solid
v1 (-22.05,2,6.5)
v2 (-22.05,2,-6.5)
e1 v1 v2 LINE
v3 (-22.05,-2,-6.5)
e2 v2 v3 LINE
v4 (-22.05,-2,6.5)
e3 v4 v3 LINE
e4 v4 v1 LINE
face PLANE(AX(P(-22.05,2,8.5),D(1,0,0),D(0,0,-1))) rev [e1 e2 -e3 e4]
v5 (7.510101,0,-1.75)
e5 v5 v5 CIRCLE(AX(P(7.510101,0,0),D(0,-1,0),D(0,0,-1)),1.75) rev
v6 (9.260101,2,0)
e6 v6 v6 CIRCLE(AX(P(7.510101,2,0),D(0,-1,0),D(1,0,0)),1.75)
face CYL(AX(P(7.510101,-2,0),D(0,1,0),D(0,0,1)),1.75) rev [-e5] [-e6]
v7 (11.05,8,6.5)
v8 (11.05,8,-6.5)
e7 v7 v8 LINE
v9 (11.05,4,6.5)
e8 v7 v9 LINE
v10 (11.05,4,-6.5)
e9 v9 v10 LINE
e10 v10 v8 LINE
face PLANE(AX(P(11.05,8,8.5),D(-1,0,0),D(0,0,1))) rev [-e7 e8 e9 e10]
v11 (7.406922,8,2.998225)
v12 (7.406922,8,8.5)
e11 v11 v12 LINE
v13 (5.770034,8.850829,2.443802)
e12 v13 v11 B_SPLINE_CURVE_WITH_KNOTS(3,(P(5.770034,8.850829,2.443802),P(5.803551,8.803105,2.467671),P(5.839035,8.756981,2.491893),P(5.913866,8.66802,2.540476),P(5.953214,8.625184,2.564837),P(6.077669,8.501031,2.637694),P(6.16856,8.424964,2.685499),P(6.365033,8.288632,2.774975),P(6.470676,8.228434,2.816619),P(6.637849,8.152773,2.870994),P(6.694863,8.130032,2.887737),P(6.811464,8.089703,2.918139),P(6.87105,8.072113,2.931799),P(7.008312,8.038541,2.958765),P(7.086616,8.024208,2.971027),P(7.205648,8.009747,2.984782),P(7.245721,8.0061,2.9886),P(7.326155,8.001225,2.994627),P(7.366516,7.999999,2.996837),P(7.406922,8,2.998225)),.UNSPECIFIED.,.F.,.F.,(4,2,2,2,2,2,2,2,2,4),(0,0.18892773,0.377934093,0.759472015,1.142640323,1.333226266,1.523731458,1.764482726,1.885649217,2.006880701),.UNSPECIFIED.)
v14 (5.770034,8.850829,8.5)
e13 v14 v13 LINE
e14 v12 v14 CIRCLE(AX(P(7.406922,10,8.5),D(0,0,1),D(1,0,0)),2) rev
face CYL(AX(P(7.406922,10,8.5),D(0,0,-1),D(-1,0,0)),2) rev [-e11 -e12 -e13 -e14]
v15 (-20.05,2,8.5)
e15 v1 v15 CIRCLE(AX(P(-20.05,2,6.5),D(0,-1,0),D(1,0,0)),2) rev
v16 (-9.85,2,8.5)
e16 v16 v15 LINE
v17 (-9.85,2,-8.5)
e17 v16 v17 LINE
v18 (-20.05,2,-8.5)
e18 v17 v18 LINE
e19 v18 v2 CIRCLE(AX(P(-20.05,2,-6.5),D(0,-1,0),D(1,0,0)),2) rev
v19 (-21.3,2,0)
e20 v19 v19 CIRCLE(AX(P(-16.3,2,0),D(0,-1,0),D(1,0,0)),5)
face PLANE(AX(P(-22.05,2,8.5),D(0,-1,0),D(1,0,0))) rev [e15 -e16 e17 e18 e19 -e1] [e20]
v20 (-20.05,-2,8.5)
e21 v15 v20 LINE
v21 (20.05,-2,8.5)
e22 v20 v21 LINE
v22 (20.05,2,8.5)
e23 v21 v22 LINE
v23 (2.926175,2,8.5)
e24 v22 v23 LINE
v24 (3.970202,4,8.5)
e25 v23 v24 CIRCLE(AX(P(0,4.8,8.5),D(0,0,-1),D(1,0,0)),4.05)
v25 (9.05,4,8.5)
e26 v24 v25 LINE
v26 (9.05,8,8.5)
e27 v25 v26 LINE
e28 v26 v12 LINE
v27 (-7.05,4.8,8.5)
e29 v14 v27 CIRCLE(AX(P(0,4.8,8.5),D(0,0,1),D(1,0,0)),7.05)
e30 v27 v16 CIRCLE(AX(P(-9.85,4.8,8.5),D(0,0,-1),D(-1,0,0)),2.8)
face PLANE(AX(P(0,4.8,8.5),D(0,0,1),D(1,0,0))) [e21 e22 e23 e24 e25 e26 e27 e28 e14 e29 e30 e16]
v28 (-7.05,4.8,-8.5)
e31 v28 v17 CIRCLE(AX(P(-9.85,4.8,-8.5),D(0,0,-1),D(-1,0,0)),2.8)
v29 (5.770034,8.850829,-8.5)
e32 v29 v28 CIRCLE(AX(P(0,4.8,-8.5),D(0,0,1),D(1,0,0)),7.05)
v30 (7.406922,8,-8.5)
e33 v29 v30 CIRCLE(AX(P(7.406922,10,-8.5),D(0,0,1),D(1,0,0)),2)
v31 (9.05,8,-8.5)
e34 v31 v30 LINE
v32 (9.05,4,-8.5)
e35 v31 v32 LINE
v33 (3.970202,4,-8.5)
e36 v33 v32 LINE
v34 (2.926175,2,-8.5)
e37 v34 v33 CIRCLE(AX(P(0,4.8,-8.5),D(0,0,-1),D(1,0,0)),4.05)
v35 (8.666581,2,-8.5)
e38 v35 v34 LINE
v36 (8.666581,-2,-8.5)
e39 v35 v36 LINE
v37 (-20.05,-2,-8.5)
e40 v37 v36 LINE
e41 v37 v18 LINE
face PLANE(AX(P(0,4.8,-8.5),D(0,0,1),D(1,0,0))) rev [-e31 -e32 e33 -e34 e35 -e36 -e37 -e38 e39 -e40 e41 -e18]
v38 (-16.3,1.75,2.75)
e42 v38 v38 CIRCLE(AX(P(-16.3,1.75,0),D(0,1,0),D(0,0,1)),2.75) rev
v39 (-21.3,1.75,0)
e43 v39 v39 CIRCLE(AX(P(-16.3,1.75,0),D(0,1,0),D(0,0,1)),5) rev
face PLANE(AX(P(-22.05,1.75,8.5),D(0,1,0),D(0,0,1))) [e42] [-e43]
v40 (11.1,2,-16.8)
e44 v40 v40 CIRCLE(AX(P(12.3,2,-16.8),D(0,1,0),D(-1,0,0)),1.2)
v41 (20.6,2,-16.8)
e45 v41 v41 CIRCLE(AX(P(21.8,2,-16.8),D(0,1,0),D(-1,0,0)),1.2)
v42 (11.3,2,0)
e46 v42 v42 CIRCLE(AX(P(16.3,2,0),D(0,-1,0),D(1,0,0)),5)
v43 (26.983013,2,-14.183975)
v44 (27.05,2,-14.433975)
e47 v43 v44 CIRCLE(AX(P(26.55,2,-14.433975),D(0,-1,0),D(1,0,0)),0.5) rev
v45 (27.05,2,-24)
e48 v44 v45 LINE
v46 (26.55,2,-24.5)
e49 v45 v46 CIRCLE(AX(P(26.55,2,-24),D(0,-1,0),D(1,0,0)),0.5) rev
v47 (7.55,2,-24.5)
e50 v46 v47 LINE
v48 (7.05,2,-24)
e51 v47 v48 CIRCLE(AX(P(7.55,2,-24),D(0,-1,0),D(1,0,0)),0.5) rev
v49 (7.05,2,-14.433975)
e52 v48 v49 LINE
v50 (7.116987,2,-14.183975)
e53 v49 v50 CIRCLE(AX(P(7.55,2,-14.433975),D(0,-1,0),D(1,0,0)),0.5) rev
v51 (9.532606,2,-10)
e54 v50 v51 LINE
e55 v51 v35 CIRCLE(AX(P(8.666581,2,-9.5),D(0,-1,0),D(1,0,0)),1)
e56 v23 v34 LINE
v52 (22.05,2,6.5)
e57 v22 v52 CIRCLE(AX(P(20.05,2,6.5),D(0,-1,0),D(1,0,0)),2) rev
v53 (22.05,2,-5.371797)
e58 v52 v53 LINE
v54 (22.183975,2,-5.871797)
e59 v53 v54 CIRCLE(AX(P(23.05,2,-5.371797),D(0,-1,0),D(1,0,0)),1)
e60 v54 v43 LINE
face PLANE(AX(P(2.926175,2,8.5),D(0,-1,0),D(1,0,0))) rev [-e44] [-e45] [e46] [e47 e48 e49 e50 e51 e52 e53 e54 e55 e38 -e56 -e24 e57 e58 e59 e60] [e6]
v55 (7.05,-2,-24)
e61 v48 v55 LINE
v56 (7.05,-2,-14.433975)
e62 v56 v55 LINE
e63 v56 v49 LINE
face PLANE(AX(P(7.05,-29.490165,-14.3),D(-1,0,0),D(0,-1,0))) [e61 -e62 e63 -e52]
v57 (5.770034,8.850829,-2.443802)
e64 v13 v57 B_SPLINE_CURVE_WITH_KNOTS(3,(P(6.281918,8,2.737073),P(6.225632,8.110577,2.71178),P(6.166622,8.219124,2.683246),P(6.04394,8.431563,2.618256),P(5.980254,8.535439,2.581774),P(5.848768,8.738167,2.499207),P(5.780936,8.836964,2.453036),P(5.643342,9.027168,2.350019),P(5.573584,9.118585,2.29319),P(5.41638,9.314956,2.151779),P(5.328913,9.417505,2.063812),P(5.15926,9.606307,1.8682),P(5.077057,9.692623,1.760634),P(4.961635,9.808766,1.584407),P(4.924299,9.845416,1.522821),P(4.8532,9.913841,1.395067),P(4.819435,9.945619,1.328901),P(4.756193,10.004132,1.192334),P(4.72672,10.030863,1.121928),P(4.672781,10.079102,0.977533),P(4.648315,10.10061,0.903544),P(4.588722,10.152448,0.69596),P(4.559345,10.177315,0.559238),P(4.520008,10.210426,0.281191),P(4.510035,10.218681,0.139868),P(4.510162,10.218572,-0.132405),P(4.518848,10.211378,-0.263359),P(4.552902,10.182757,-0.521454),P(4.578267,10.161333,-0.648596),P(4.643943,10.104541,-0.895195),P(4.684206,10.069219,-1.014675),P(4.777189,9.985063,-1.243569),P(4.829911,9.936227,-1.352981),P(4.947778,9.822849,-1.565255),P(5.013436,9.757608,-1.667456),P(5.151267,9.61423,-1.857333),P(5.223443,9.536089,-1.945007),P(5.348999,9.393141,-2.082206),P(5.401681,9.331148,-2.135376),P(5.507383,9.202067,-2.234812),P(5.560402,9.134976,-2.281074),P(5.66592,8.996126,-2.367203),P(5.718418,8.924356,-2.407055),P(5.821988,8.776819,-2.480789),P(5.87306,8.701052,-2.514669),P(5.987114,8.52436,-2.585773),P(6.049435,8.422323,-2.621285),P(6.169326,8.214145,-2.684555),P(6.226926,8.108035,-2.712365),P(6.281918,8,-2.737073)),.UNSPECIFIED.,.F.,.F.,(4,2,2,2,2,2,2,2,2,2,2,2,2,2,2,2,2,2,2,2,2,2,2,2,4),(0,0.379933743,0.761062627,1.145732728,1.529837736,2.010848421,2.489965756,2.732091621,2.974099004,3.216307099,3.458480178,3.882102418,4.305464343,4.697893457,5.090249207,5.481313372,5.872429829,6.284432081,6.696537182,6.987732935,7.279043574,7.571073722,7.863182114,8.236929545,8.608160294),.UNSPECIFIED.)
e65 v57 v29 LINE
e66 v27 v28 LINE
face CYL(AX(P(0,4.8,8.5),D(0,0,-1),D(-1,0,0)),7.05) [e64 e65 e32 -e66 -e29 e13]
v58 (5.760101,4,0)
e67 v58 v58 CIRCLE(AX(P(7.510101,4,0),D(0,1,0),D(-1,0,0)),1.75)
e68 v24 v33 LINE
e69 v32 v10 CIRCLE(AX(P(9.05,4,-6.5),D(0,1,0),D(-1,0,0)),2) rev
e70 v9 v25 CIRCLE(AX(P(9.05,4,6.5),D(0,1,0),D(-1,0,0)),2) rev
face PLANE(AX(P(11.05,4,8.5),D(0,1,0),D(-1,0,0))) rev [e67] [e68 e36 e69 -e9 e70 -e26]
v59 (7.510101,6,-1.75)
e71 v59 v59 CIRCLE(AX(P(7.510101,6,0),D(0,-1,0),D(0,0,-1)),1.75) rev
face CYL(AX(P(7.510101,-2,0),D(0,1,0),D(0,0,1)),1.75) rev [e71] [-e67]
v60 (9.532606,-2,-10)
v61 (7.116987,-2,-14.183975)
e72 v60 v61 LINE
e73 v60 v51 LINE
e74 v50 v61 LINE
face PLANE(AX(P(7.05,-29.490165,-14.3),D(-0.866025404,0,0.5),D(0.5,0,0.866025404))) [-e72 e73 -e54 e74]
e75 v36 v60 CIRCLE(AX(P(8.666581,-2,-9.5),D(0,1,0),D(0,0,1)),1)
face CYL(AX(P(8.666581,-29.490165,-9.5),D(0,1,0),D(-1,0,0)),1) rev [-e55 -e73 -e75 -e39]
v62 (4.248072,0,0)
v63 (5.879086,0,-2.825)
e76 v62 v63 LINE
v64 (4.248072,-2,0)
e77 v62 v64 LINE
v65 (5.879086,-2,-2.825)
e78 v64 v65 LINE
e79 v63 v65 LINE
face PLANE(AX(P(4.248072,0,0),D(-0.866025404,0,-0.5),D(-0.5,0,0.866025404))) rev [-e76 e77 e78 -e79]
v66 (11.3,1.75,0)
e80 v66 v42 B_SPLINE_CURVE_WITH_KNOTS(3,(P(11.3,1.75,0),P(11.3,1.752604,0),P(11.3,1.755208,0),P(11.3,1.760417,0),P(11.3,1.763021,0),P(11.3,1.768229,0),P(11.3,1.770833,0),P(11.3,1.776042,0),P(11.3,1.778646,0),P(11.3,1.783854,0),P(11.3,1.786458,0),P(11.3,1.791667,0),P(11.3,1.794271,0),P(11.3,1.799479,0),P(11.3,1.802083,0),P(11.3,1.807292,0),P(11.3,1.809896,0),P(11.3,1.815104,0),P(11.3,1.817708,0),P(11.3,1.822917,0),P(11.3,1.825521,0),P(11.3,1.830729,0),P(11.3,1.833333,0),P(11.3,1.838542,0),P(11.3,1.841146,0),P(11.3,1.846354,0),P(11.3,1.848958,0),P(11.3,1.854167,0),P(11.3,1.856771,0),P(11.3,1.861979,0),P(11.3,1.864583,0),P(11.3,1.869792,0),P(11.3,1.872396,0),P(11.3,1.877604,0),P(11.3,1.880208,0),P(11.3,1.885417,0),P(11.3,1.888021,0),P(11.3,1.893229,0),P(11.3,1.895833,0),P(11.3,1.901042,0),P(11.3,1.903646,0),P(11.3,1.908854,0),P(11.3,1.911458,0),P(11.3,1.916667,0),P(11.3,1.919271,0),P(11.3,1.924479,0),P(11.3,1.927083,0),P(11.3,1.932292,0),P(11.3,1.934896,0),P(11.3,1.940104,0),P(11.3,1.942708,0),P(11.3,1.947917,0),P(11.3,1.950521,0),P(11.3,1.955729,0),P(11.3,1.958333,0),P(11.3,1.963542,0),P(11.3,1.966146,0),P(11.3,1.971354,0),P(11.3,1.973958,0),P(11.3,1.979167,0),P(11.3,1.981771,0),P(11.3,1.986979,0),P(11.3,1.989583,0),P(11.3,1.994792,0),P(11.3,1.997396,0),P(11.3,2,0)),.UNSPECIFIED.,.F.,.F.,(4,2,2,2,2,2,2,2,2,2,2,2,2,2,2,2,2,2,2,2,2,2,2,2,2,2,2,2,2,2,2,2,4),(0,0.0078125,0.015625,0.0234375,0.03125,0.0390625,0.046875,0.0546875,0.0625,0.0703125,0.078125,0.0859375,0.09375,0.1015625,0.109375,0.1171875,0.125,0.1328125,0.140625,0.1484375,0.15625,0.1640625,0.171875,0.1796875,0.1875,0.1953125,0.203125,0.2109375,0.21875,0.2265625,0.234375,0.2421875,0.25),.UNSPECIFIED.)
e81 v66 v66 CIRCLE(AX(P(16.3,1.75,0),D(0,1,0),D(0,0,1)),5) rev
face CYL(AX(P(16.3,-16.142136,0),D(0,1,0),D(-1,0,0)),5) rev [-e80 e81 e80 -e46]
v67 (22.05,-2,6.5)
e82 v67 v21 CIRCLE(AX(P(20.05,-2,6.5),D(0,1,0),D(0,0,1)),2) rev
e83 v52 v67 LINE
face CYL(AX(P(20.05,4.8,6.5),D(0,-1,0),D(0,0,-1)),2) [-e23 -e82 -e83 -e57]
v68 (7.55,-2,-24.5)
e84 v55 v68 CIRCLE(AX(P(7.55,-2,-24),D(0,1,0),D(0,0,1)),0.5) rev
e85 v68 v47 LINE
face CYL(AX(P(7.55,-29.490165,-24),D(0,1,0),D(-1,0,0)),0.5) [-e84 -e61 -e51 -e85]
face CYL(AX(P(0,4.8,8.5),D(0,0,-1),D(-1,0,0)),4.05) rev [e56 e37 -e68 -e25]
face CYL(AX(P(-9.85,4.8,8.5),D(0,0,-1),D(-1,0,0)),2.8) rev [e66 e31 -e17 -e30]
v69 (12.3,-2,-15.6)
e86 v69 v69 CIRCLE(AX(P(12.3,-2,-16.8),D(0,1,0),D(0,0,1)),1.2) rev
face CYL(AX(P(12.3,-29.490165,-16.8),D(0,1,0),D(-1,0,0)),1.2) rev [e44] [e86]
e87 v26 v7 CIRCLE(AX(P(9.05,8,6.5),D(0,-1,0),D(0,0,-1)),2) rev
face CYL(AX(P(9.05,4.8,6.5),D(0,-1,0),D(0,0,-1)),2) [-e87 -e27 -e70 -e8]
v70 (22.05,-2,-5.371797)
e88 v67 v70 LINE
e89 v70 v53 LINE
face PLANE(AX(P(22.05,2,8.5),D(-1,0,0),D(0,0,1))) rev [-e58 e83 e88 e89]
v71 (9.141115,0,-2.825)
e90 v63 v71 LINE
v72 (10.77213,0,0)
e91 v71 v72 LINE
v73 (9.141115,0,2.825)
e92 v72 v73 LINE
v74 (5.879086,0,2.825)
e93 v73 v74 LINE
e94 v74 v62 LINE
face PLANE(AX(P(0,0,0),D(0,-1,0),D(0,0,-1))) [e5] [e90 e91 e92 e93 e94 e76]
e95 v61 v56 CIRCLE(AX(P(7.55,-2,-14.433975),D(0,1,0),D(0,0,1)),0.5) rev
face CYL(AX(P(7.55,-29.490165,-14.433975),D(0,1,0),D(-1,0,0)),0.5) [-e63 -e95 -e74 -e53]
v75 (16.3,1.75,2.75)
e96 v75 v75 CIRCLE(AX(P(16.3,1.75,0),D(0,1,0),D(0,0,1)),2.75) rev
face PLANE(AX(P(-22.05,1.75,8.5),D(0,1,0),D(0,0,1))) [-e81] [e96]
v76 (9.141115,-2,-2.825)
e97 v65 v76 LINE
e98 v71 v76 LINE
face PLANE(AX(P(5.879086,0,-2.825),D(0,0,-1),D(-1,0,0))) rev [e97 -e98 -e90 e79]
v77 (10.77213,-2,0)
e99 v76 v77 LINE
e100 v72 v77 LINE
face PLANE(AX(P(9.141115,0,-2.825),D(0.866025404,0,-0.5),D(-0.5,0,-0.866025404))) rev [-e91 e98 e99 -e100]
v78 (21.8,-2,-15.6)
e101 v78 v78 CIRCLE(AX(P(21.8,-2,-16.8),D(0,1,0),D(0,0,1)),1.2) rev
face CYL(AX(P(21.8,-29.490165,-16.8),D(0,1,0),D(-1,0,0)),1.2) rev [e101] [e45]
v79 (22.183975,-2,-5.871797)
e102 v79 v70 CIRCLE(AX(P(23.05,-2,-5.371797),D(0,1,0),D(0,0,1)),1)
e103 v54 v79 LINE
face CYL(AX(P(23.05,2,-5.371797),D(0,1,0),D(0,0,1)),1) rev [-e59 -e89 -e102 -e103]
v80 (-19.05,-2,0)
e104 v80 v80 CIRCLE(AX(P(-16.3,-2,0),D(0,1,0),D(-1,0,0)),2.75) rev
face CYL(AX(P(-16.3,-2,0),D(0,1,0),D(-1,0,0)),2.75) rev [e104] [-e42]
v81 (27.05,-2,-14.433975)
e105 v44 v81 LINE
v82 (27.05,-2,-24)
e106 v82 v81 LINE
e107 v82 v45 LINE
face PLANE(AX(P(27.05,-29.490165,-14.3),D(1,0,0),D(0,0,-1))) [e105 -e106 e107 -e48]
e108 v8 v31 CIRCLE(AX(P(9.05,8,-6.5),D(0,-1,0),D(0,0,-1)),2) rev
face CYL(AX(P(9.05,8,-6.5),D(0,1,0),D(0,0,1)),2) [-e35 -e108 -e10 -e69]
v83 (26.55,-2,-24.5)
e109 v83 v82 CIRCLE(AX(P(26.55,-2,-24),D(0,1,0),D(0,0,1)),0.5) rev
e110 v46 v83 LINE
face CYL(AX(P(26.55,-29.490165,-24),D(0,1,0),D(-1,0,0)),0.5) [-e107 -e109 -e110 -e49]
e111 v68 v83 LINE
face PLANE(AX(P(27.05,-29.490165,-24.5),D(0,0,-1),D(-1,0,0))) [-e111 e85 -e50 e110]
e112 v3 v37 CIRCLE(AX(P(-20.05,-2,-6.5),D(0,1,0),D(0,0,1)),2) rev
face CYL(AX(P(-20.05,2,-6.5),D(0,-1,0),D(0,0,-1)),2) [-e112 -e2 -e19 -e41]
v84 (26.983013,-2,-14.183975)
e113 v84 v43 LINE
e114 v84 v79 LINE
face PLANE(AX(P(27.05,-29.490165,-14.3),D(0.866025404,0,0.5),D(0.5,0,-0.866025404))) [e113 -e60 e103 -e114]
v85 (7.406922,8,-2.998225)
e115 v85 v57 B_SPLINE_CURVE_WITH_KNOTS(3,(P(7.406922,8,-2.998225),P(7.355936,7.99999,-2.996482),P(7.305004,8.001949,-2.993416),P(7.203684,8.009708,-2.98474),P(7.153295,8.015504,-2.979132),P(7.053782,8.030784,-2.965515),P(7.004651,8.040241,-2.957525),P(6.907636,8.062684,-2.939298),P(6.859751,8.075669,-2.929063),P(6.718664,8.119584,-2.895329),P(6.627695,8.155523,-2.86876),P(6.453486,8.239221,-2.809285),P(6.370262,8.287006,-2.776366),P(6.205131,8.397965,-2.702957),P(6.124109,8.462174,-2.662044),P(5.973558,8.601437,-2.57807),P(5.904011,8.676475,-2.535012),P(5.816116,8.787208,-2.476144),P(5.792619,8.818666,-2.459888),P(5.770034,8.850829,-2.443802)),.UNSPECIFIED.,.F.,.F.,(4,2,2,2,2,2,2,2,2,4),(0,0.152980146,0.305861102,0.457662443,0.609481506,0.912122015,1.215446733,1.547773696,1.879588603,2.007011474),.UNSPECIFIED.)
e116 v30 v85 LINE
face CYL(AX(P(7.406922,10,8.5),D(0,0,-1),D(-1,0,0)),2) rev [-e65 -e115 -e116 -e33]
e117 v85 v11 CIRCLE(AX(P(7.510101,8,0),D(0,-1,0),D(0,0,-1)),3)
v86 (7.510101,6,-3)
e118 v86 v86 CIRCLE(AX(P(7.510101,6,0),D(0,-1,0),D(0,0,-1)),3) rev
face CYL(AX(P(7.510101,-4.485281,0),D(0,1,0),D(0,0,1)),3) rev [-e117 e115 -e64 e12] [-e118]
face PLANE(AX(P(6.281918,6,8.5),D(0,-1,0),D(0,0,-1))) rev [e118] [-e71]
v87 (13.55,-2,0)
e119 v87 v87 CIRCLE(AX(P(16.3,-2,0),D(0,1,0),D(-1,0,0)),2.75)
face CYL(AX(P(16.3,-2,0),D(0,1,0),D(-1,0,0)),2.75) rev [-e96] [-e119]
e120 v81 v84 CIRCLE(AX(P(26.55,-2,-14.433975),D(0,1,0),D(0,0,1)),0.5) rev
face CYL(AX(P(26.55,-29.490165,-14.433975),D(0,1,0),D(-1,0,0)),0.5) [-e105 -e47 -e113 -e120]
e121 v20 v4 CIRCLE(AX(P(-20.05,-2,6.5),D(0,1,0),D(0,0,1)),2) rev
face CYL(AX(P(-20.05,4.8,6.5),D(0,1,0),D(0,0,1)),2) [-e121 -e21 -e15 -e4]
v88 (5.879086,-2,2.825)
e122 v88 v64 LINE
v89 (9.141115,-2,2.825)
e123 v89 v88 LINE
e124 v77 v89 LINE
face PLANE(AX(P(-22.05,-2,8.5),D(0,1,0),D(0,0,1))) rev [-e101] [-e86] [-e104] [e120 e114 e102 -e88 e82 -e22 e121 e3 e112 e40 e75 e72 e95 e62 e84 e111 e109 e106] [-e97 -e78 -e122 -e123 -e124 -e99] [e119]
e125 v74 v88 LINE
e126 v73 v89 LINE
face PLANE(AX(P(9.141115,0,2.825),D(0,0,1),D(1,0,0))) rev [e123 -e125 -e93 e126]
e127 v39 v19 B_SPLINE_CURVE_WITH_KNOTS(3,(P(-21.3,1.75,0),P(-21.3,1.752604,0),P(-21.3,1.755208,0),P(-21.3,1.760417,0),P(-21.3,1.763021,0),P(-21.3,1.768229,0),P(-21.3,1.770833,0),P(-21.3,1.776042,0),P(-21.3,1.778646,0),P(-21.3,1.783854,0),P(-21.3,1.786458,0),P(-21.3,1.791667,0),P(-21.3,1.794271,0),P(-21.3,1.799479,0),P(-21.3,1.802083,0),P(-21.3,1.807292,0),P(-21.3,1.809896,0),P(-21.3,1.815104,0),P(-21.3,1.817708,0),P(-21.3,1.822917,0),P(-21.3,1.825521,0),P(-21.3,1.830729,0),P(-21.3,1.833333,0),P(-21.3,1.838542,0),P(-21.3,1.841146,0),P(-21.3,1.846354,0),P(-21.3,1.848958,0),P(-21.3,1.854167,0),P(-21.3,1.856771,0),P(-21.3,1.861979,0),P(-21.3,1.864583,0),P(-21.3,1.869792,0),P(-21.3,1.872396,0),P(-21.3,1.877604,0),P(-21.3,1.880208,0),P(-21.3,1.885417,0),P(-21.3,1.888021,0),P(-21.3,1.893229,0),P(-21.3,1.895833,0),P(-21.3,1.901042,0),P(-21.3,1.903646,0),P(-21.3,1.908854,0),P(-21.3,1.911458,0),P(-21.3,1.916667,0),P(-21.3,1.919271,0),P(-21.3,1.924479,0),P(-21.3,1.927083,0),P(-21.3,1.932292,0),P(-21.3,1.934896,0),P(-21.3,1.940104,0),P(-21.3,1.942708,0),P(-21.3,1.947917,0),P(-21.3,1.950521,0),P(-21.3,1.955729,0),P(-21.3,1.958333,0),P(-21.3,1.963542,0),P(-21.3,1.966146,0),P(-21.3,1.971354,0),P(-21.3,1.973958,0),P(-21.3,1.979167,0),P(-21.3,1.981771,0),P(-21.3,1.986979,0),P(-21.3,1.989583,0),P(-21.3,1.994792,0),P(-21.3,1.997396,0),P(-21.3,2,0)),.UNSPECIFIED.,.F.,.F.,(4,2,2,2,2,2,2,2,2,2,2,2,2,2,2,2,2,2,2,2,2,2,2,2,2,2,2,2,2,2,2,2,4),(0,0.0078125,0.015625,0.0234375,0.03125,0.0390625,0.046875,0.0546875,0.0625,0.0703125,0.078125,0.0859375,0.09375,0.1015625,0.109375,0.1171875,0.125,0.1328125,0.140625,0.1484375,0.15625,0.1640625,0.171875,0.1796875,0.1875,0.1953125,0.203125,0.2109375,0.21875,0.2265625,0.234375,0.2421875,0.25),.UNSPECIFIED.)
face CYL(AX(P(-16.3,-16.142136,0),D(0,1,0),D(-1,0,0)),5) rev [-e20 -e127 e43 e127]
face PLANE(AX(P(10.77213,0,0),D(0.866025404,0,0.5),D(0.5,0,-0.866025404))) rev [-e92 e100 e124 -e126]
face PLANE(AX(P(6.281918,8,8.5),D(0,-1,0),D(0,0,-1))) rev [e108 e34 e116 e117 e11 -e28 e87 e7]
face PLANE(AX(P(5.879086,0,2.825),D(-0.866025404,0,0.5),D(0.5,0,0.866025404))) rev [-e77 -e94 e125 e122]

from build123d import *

# Parameters (mm, degrees)
BOSS_EXTRUDE1_DEPTH     = 8.5
CUT_EXTRUDE1_DEPTH      = 2
CUT_EXTRUDE1_DEPTH_BACK = 26.602245995
SKETCH2_R               = 2.75
CUT_EXTRUDE2_DEPTH      = 2
CUT_EXTRUDE2_DEPTH_BACK = 0.25
SKETCH2_3_R             = 5
SKETCH2_3_R_2           = 2.75
SKETCH3_R               = 1.75
CUT_EXTRUDE3_DEPTH      = 28.391148205
SKETCH3_3_R             = 3
SKETCH3_3_R_2           = 1.75
CUT_EXTRUDE4_DEPTH      = 5.85
FILLET1_R               = 2
FILLET2_R               = 2
CUT_EXTRUDE5_DEPTH      = 2
SKETCH5_R               = 1.2
BOSS_EXTRUDE2_DEPTH     = 4
FILLET3_R               = 1
FILLET4_R               = 0.5


with BuildPart() as part:
    # Sketch1 → Boss-Extrude1 (new, symmetric)
    with BuildSketch(Plane.XY):
        with BuildLine():
            Line((11.05, 4), (3.970201506, 4))
            ThreePointArc((3.970201506, 4), (-3.590264914, 6.674165907), (2.926174978, 2))
            Line((2.926174978, 2), (22.05, 2))
            Line((22.05, 2), (22.05, -2))
            Line((22.05, -2), (-22.05, -2))
            Line((-22.05, -2), (-22.05, 2))
            Line((-22.05, 2), (-9.85, 2))
            ThreePointArc((-9.85, 2), (-7.870101013, 2.820101013), (-7.05, 4.8))
            ThreePointArc((-7.05, 4.8), (-1.645444408, 11.655290855), (6.281918497, 8))
            Line((6.281918497, 8), (11.05, 8))
            Line((11.05, 8), (11.05, 4))
        make_face()
    extrude(amount=BOSS_EXTRUDE1_DEPTH, both=True)

    # Sketch2 → Cut-Extrude1 (cut, two sides: drawn at the far end of the back side and taken through both)
    with BuildSketch(Plane(origin=(0, 2, 0), x_dir=(1, 0, 0), z_dir=(0, 1, 0)).offset(-CUT_EXTRUDE1_DEPTH_BACK)):
        with Locations(Location((16.3, 0, 0), (0, 0, 180))):
            Circle(SKETCH2_R)
        with Locations(Location((-16.3, 0, 0), (0, 0, 180))):
            Circle(SKETCH2_R)
    extrude(amount=CUT_EXTRUDE1_DEPTH + CUT_EXTRUDE1_DEPTH_BACK, mode=Mode.SUBTRACT)

    # Sketch2<3> → Cut-Extrude2 (cut, two sides: drawn at the far end of the back side and taken through both)
    # profile 1 of 2: a face of its own
    with BuildSketch(Plane(origin=(0, 2, 0), x_dir=(1, 0, 0), z_dir=(0, 1, 0)).offset(-CUT_EXTRUDE2_DEPTH_BACK)):
        with Locations(Location((16.3, 0, 0), (0, 0, 180))):
            Circle(SKETCH2_3_R)
        with Locations(Location((16.3, 0, 0), (0, 0, 180))):
            Circle(SKETCH2_3_R_2, mode=Mode.SUBTRACT)
    # profile 2 of 2: a face of its own
    with BuildSketch(Plane(origin=(0, 2, 0), x_dir=(1, 0, 0), z_dir=(0, 1, 0)).offset(-CUT_EXTRUDE2_DEPTH_BACK)):
        with Locations(Location((-16.3, 0, 0), (0, 0, 180))):
            Circle(SKETCH2_3_R)
        with Locations(Location((-16.3, 0, 0), (0, 0, 180))):
            Circle(SKETCH2_3_R_2, mode=Mode.SUBTRACT)
    extrude(amount=CUT_EXTRUDE2_DEPTH + CUT_EXTRUDE2_DEPTH_BACK, mode=Mode.SUBTRACT)

    # Sketch3 → Cut-Extrude3 (cut, through all)
    with BuildSketch(Plane(origin=(0, 11.85, 0), x_dir=(1, 0, 0), z_dir=(0, 1, 0))):
        with Locations(Location((7.510100753, 0, 0), (0, 0, 225.426920251))):
            Circle(SKETCH3_R)
    extrude(amount=-CUT_EXTRUDE3_DEPTH, mode=Mode.SUBTRACT)

    # Sketch3<3> → Cut-Extrude4 (cut)
    # profile 1 of 2: a face of its own
    with BuildSketch(Plane(origin=(0, 11.85, 0), x_dir=(1, 0, 0), z_dir=(0, 1, 0))):
        with Locations(Location((7.510100753, 0, 0), (0, 0, 245.83322212))):
            Circle(SKETCH3_3_R)
        with Locations(Location((7.510100753, 0, 0), (0, 0, 180))):
            Circle(SKETCH3_3_R_2, mode=Mode.SUBTRACT)
    # profile 2 of 2: a face of its own
    with BuildSketch(Plane(origin=(0, 11.85, 0), x_dir=(1, 0, 0), z_dir=(0, 1, 0))):
        with Locations(Location((7.510100753, 0, 0), (0, 0, 180))):
            Circle(SKETCH3_3_R_2)
    extrude(amount=-CUT_EXTRUDE4_DEPTH, mode=Mode.SUBTRACT)

    # Fillet1
    fillet1_edges = [part.edges().sort_by_distance(p)[0] for p in [
        (22.05, 0, 8.5),
        (-22.05, 0, -8.5),
        (-22.05, 0, 8.5),
    ]]
    fillet(fillet1_edges, radius=FILLET1_R)

    # Fillet2
    # the kernel refuses this fillet: 2 mm, written as the material it adds along each edge
    with BuildSketch(Plane(origin=(6.281918497, 8, -0.075436901), x_dir=(1, 0, 0), z_dir=(0, 0, 1))) as fillet2_piece_1_section:
        with BuildLine():
            CenterArc((1.125003941, 2), FILLET2_R, 215.07061915, 54.92938085)
            ThreePointArc((-0.511884995, 0.850828729), (-0.240944724, 0.434437491), (0, 0))
            Line((0, 0), (1.125003941, 0))
        make_face()
    fillet2_piece_1 = extrude(amount=8.575436901, mode=Mode.PRIVATE)
    fillet2_piece_1 = fillet2_piece_1 - Plane(origin=(7.510100753, 8.184515376, 0), x_dir=(-0.4093940854484991, 0, 0.9123576507049125), z_dir=(0, 1, 0)) * Cylinder(3, 22, mode=Mode.PRIVATE)
    add(fillet2_piece_1)
    with BuildSketch(Plane(origin=(6.281918497, 8, -8.5), x_dir=(1, 0, 0), z_dir=(0, 0, 1))) as fillet2_piece_2_section:
        with BuildLine():
            CenterArc((1.125003941, 2), FILLET2_R, 215.07061915, 54.92938085)
            ThreePointArc((-0.511884995, 0.850828729), (-0.240944724, 0.434437491), (0, 0))
            Line((0, 0), (1.125003941, 0))
        make_face()
    fillet2_piece_2 = extrude(amount=8.575436901, mode=Mode.PRIVATE)
    fillet2_piece_2 = fillet2_piece_2 - Plane(origin=(7.510100753, 8.184515325, 0), x_dir=(-0.4093940854484991, 0, 0.9123576507049125), z_dir=(0, 1, 0)) * Cylinder(3, 22, mode=Mode.PRIVATE)
    add(fillet2_piece_2)
    # the kernel refuses this fillet: 2 mm, written as the material it takes off along each edge
    with BuildSketch(Plane(origin=(11.05, 13, -8.5), x_dir=(-1, 0, 0), z_dir=(0, -1, 0))) as fillet2_2_piece_1_section:
        with BuildLine():
            CenterArc((FILLET2_R, -FILLET2_R), FILLET2_R, 90, 90)
            Line((0, -FILLET2_R), (0, 0))
            Line((0, 0), (FILLET2_R, 0))
        make_face()
    fillet2_2_piece_1 = extrude(amount=14, mode=Mode.PRIVATE)
    fillet2_2_piece_1 = split(fillet2_2_piece_1, bisect_by=Plane(origin=(10.603264122, 2, -8.053264122), z_dir=(0, 1, 0)), keep=Keep.TOP, mode=Mode.PRIVATE)
    add(fillet2_2_piece_1, mode=Mode.SUBTRACT)
    with BuildSketch(Plane(origin=(11.05, 13, 8.5), x_dir=(-1, 0, 0), z_dir=(0, -1, 0))) as fillet2_2_piece_2_section:
        with BuildLine():
            CenterArc((FILLET2_R, FILLET2_R), FILLET2_R, 180, 90)
            Line((0, FILLET2_R), (0, 0))
            Line((0, 0), (FILLET2_R, 0))
        make_face()
    fillet2_2_piece_2 = extrude(amount=14, mode=Mode.PRIVATE)
    fillet2_2_piece_2 = split(fillet2_2_piece_2, bisect_by=Plane(origin=(10.603264122, 2, 8.053264122), z_dir=(0, 1, 0)), keep=Keep.TOP, mode=Mode.PRIVATE)
    add(fillet2_2_piece_2, mode=Mode.SUBTRACT)

    # Sketch4 → Cut-Extrude5 (cut)
    with BuildSketch(Plane.XZ.offset(2)):
        Polygon((10.772129774, 0), (9.141115264, 2.825), (5.879086243, 2.825), (4.248071732, 0), (5.879086243, -2.825), (9.141115264, -2.825), align=None)
    extrude(amount=-CUT_EXTRUDE5_DEPTH, mode=Mode.SUBTRACT)

    # Sketch5 → Boss-Extrude2 (add)
    with BuildSketch(Plane(origin=(0, 2, 0), x_dir=(1, 0, 0), z_dir=(0, 1, 0))):
        Polygon((27.05, 14.3), (27.05, 24.5), (7.05, 24.5), (7.05, 14.3), (10.398631561, 8.5), (22.05, 8.5), (22.05, 5.639745962), align=None)
        with Locations(Location((21.8, 16.8, 0), (0, 0, 180))):
            Circle(SKETCH5_R, mode=Mode.SUBTRACT)
        with Locations(Location((12.3, 16.8, 0), (0, 0, 180))):
            Circle(SKETCH5_R, mode=Mode.SUBTRACT)
    extrude(amount=-BOSS_EXTRUDE2_DEPTH)

    # Fillet3
    fillet3_edges = [part.edges().sort_by_distance(p)[0] for p in [
        (10.398631561, 0, -8.5),
        (22.05, 0, -5.639745962),
    ]]
    fillet(fillet3_edges, radius=FILLET3_R)

    # Fillet4
    fillet4_edges = [part.edges().sort_by_distance(p)[0] for p in [
        (27.05, 0, -24.5),
        (7.05, 0, -24.5),
        (7.05, 0, -14.3),
        (27.05, 0, -14.3),
    ]]
    fillet(fillet4_edges, radius=FILLET4_R)


solid = part.part
